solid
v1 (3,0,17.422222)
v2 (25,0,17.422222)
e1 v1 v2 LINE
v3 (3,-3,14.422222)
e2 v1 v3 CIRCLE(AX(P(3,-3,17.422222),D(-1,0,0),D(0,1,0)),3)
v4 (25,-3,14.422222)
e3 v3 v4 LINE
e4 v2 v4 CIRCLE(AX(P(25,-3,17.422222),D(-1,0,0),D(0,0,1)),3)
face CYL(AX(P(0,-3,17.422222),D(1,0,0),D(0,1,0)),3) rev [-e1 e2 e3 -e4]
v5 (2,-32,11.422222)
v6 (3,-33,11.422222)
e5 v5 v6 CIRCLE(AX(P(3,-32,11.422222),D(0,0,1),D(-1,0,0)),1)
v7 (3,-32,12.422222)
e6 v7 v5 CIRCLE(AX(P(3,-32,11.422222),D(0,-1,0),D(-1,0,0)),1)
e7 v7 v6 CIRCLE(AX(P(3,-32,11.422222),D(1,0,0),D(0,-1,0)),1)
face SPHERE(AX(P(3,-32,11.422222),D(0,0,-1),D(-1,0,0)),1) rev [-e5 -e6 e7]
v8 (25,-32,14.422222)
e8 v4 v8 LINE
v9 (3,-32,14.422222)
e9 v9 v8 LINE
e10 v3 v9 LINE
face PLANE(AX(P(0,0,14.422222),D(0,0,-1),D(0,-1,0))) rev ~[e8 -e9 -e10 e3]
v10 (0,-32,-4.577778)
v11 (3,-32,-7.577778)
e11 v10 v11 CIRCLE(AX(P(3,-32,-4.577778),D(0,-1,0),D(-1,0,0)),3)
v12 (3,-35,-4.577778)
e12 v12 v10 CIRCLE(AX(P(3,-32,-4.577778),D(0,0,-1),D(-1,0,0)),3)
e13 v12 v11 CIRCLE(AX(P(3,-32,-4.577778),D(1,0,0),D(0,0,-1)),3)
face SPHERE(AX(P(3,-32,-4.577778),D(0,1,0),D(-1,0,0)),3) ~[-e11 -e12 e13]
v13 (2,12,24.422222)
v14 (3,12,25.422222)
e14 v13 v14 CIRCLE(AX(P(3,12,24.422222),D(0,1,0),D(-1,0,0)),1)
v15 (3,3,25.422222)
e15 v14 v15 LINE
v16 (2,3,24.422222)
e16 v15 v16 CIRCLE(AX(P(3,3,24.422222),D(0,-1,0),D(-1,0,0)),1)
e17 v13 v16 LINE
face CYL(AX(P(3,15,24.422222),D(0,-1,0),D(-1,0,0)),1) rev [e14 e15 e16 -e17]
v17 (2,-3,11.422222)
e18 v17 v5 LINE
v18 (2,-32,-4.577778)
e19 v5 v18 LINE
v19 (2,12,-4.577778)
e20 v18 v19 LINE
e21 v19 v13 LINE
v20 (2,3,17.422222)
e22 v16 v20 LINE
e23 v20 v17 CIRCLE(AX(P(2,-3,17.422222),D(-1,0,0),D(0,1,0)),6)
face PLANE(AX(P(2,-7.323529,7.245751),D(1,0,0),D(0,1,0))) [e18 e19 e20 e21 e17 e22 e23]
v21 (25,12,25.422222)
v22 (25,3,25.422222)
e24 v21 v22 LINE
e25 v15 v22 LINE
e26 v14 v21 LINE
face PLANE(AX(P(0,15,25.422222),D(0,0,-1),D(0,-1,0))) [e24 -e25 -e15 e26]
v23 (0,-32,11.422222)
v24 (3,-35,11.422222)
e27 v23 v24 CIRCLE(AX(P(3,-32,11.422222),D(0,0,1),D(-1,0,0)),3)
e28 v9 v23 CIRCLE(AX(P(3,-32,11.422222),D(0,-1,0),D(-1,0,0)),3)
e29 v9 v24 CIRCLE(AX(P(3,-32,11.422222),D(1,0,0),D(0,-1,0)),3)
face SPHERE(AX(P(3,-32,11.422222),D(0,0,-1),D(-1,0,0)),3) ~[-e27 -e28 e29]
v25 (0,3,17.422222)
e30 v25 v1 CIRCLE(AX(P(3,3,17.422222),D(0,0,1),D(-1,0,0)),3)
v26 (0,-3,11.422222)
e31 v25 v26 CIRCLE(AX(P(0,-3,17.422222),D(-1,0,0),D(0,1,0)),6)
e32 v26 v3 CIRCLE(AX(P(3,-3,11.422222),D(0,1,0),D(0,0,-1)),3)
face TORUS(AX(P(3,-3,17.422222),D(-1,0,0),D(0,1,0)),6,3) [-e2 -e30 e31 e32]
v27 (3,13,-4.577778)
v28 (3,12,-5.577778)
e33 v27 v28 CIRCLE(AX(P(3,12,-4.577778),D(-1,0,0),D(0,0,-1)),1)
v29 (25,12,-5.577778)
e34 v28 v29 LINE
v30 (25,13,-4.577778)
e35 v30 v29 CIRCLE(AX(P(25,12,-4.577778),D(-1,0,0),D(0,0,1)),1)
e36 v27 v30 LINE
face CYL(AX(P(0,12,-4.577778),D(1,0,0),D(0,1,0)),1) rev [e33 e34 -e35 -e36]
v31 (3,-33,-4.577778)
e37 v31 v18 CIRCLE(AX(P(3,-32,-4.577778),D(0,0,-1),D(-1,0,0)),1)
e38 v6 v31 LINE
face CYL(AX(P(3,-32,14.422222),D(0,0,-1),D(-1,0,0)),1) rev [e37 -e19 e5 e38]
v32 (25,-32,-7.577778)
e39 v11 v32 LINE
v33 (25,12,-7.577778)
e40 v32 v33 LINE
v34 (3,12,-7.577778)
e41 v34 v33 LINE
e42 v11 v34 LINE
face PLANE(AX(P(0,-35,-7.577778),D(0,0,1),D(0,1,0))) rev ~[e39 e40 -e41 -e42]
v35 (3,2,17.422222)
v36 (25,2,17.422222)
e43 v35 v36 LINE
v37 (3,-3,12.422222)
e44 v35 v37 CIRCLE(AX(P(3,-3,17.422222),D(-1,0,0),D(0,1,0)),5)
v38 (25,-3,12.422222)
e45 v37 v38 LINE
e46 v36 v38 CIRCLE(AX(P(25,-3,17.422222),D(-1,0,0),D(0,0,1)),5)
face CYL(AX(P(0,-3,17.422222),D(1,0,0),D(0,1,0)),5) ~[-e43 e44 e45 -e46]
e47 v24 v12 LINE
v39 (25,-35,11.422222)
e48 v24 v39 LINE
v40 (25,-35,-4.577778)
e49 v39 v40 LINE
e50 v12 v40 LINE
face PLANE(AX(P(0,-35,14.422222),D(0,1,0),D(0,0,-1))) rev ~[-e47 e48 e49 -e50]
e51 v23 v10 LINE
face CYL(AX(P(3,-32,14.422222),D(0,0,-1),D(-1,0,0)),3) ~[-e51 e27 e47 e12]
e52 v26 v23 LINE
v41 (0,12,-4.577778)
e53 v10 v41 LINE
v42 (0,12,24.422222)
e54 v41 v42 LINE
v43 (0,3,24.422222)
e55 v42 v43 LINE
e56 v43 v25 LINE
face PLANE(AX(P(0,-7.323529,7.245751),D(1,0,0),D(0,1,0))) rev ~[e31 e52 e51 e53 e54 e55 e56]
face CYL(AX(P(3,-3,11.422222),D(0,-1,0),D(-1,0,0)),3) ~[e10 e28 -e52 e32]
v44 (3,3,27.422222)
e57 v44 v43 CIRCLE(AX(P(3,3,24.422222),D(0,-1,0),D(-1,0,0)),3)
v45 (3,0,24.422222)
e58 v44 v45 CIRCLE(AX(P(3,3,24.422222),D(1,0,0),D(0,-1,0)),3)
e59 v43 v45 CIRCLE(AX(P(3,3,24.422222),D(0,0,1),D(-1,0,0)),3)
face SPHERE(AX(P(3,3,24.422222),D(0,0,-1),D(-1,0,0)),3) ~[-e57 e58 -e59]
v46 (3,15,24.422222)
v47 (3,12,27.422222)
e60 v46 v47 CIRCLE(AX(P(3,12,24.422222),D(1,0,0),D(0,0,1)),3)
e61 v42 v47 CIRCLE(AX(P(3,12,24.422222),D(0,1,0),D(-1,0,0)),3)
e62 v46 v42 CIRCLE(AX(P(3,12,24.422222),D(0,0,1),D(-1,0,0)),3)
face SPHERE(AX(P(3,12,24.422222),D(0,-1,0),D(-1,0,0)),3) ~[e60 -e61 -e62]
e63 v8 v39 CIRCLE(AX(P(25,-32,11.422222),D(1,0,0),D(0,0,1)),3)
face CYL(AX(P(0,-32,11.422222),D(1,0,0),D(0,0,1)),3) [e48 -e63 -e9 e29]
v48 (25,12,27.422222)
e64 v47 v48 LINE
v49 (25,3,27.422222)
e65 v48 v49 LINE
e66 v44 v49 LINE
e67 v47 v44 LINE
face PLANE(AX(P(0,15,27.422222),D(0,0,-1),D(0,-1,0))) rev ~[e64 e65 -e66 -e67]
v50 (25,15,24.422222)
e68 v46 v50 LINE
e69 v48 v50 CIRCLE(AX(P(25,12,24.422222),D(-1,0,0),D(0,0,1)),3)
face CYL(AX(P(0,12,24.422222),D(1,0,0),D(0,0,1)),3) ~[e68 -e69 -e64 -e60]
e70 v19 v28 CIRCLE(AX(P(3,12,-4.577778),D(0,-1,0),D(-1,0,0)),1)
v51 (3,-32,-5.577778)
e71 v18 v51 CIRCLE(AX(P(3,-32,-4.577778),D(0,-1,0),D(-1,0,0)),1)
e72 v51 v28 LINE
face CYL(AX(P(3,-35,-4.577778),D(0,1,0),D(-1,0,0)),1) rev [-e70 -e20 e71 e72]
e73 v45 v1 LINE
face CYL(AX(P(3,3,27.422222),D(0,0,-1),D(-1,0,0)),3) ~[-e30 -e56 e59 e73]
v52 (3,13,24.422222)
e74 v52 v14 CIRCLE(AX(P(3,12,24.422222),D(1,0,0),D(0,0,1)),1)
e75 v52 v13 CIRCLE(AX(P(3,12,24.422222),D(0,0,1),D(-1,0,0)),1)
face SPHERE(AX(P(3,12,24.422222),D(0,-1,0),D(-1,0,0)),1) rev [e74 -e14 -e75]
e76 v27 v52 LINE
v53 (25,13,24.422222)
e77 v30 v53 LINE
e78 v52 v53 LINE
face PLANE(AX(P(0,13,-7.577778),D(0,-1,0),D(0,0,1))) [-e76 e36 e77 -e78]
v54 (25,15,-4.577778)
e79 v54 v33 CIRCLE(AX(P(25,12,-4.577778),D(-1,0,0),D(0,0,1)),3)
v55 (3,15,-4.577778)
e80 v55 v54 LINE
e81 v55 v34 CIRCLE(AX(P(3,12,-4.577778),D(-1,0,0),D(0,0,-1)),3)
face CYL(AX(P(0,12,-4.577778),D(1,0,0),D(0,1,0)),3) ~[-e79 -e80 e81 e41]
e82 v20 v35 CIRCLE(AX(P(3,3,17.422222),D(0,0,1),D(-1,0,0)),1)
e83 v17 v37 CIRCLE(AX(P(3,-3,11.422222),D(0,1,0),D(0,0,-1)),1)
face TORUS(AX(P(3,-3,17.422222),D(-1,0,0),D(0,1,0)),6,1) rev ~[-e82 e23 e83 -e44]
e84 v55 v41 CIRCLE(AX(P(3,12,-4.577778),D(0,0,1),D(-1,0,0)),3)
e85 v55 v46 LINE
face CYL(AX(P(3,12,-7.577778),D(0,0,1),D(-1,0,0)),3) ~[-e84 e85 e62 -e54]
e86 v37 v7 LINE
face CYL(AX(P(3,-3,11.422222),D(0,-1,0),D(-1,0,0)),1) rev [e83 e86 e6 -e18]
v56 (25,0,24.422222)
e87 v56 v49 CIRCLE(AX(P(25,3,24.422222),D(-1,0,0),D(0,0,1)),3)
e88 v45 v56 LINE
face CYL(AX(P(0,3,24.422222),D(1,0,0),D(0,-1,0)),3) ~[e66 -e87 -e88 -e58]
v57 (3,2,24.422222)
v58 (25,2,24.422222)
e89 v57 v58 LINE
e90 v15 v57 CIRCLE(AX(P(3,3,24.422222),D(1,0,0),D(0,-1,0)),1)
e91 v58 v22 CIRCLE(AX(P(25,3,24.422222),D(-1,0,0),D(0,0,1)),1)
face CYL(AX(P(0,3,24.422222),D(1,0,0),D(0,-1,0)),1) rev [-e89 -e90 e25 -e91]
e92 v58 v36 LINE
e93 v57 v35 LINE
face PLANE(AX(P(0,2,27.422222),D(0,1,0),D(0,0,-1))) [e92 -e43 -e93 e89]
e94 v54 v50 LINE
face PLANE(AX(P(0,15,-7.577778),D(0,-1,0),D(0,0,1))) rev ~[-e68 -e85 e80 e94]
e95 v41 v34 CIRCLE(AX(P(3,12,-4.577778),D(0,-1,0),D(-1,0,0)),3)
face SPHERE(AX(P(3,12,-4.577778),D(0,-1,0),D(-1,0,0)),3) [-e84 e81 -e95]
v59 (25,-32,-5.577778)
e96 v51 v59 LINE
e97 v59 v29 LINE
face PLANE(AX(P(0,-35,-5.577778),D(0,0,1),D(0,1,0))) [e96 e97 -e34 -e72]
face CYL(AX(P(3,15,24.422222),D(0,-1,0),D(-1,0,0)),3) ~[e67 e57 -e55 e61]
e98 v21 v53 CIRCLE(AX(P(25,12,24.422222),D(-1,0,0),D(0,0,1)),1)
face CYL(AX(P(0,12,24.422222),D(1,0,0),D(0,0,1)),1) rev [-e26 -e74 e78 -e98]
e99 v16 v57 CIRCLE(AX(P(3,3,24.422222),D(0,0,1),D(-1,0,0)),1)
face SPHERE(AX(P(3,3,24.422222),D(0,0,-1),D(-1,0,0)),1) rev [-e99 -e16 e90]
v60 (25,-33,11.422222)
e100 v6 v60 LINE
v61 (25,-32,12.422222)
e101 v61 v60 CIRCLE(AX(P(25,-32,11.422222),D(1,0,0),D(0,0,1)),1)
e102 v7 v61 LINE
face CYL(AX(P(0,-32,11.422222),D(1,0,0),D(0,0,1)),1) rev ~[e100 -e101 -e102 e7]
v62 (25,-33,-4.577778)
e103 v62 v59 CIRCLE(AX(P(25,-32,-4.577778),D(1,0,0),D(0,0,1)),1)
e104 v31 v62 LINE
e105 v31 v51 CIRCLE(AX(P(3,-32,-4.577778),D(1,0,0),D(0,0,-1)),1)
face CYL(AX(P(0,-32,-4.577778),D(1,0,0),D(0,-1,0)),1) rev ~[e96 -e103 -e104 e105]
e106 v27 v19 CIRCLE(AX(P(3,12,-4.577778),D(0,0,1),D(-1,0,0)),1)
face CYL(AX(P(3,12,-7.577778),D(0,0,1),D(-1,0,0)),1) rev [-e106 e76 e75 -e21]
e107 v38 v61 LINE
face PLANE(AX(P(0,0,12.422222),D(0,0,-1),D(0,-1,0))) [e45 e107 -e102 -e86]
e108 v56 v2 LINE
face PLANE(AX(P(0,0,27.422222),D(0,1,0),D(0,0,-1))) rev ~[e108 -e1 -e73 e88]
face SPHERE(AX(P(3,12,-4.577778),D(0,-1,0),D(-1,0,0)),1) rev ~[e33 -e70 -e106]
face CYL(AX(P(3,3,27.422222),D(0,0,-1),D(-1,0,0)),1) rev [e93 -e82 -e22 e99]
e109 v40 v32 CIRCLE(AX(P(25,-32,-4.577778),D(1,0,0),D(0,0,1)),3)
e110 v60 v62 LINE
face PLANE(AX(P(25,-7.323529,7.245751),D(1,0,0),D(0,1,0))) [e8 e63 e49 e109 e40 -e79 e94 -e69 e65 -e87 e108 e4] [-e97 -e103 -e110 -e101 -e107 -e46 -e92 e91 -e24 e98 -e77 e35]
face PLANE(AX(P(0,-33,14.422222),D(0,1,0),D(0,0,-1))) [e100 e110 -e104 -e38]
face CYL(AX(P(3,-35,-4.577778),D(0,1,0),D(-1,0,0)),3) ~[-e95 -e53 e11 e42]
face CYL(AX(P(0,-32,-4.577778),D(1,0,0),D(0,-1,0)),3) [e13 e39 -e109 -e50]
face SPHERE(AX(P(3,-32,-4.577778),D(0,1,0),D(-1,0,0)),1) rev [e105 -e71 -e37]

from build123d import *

# Parameters (mm, degrees)
F1_DEPTH = 25
F2_F1_R  = 3
F2_F2_R  = 3
F3_T     = -2


with BuildPart() as f1:
    # F0 (on Right) → F1 (new body)
    with BuildSketch(Plane.YZ):
        Polygon((0, 27.4222218948), (0, 14.4222218948), (-35, 14.4222218948), (-35, -7.5777781052), (15, -7.5777781052), (15, 27.4222218948), align=None)
    extrude(amount=F1_DEPTH)

    # F2: fillet of radius 3 on 11 edges, made by hand

    # F2_f1
    f2_f1_edges = [f1.edges().sort_by_distance(p)[0] for p in [
        (12.5, 0, 14.4222218948),
    ]]
    fillet(f2_f1_edges, radius=F2_F1_R)

    # F2_f2
    f2_f2_edges = [f1.edges().sort_by_distance(p)[0] for p in [
        (0, -10, -7.5777781052),
        (0, -35, 3.4222218948),
        (0, -19, 14.4222218948),
        (0, 7.5, 27.4222218948),
        (0, 15, 9.9222218948),
        (12.5, 15, -7.5777781052),
        (12.5, -35, -7.5777781052),
        (12.5, -35, 14.4222218948),
        (12.5, 0, 27.4222218948),
        (12.5, 15, 27.4222218948),
        (0, -0.8786796564, 15.3009015512),
    ]]
    fillet(f2_f2_edges, radius=F2_F2_R)

    # F3
    f3_openings = [f1.faces().sort_by_distance(p)[0] for p in [
        (25, -7.351061, 6.036173),
    ]]
    offset(amount=F3_T, openings=f3_openings)


solid = f1.part
